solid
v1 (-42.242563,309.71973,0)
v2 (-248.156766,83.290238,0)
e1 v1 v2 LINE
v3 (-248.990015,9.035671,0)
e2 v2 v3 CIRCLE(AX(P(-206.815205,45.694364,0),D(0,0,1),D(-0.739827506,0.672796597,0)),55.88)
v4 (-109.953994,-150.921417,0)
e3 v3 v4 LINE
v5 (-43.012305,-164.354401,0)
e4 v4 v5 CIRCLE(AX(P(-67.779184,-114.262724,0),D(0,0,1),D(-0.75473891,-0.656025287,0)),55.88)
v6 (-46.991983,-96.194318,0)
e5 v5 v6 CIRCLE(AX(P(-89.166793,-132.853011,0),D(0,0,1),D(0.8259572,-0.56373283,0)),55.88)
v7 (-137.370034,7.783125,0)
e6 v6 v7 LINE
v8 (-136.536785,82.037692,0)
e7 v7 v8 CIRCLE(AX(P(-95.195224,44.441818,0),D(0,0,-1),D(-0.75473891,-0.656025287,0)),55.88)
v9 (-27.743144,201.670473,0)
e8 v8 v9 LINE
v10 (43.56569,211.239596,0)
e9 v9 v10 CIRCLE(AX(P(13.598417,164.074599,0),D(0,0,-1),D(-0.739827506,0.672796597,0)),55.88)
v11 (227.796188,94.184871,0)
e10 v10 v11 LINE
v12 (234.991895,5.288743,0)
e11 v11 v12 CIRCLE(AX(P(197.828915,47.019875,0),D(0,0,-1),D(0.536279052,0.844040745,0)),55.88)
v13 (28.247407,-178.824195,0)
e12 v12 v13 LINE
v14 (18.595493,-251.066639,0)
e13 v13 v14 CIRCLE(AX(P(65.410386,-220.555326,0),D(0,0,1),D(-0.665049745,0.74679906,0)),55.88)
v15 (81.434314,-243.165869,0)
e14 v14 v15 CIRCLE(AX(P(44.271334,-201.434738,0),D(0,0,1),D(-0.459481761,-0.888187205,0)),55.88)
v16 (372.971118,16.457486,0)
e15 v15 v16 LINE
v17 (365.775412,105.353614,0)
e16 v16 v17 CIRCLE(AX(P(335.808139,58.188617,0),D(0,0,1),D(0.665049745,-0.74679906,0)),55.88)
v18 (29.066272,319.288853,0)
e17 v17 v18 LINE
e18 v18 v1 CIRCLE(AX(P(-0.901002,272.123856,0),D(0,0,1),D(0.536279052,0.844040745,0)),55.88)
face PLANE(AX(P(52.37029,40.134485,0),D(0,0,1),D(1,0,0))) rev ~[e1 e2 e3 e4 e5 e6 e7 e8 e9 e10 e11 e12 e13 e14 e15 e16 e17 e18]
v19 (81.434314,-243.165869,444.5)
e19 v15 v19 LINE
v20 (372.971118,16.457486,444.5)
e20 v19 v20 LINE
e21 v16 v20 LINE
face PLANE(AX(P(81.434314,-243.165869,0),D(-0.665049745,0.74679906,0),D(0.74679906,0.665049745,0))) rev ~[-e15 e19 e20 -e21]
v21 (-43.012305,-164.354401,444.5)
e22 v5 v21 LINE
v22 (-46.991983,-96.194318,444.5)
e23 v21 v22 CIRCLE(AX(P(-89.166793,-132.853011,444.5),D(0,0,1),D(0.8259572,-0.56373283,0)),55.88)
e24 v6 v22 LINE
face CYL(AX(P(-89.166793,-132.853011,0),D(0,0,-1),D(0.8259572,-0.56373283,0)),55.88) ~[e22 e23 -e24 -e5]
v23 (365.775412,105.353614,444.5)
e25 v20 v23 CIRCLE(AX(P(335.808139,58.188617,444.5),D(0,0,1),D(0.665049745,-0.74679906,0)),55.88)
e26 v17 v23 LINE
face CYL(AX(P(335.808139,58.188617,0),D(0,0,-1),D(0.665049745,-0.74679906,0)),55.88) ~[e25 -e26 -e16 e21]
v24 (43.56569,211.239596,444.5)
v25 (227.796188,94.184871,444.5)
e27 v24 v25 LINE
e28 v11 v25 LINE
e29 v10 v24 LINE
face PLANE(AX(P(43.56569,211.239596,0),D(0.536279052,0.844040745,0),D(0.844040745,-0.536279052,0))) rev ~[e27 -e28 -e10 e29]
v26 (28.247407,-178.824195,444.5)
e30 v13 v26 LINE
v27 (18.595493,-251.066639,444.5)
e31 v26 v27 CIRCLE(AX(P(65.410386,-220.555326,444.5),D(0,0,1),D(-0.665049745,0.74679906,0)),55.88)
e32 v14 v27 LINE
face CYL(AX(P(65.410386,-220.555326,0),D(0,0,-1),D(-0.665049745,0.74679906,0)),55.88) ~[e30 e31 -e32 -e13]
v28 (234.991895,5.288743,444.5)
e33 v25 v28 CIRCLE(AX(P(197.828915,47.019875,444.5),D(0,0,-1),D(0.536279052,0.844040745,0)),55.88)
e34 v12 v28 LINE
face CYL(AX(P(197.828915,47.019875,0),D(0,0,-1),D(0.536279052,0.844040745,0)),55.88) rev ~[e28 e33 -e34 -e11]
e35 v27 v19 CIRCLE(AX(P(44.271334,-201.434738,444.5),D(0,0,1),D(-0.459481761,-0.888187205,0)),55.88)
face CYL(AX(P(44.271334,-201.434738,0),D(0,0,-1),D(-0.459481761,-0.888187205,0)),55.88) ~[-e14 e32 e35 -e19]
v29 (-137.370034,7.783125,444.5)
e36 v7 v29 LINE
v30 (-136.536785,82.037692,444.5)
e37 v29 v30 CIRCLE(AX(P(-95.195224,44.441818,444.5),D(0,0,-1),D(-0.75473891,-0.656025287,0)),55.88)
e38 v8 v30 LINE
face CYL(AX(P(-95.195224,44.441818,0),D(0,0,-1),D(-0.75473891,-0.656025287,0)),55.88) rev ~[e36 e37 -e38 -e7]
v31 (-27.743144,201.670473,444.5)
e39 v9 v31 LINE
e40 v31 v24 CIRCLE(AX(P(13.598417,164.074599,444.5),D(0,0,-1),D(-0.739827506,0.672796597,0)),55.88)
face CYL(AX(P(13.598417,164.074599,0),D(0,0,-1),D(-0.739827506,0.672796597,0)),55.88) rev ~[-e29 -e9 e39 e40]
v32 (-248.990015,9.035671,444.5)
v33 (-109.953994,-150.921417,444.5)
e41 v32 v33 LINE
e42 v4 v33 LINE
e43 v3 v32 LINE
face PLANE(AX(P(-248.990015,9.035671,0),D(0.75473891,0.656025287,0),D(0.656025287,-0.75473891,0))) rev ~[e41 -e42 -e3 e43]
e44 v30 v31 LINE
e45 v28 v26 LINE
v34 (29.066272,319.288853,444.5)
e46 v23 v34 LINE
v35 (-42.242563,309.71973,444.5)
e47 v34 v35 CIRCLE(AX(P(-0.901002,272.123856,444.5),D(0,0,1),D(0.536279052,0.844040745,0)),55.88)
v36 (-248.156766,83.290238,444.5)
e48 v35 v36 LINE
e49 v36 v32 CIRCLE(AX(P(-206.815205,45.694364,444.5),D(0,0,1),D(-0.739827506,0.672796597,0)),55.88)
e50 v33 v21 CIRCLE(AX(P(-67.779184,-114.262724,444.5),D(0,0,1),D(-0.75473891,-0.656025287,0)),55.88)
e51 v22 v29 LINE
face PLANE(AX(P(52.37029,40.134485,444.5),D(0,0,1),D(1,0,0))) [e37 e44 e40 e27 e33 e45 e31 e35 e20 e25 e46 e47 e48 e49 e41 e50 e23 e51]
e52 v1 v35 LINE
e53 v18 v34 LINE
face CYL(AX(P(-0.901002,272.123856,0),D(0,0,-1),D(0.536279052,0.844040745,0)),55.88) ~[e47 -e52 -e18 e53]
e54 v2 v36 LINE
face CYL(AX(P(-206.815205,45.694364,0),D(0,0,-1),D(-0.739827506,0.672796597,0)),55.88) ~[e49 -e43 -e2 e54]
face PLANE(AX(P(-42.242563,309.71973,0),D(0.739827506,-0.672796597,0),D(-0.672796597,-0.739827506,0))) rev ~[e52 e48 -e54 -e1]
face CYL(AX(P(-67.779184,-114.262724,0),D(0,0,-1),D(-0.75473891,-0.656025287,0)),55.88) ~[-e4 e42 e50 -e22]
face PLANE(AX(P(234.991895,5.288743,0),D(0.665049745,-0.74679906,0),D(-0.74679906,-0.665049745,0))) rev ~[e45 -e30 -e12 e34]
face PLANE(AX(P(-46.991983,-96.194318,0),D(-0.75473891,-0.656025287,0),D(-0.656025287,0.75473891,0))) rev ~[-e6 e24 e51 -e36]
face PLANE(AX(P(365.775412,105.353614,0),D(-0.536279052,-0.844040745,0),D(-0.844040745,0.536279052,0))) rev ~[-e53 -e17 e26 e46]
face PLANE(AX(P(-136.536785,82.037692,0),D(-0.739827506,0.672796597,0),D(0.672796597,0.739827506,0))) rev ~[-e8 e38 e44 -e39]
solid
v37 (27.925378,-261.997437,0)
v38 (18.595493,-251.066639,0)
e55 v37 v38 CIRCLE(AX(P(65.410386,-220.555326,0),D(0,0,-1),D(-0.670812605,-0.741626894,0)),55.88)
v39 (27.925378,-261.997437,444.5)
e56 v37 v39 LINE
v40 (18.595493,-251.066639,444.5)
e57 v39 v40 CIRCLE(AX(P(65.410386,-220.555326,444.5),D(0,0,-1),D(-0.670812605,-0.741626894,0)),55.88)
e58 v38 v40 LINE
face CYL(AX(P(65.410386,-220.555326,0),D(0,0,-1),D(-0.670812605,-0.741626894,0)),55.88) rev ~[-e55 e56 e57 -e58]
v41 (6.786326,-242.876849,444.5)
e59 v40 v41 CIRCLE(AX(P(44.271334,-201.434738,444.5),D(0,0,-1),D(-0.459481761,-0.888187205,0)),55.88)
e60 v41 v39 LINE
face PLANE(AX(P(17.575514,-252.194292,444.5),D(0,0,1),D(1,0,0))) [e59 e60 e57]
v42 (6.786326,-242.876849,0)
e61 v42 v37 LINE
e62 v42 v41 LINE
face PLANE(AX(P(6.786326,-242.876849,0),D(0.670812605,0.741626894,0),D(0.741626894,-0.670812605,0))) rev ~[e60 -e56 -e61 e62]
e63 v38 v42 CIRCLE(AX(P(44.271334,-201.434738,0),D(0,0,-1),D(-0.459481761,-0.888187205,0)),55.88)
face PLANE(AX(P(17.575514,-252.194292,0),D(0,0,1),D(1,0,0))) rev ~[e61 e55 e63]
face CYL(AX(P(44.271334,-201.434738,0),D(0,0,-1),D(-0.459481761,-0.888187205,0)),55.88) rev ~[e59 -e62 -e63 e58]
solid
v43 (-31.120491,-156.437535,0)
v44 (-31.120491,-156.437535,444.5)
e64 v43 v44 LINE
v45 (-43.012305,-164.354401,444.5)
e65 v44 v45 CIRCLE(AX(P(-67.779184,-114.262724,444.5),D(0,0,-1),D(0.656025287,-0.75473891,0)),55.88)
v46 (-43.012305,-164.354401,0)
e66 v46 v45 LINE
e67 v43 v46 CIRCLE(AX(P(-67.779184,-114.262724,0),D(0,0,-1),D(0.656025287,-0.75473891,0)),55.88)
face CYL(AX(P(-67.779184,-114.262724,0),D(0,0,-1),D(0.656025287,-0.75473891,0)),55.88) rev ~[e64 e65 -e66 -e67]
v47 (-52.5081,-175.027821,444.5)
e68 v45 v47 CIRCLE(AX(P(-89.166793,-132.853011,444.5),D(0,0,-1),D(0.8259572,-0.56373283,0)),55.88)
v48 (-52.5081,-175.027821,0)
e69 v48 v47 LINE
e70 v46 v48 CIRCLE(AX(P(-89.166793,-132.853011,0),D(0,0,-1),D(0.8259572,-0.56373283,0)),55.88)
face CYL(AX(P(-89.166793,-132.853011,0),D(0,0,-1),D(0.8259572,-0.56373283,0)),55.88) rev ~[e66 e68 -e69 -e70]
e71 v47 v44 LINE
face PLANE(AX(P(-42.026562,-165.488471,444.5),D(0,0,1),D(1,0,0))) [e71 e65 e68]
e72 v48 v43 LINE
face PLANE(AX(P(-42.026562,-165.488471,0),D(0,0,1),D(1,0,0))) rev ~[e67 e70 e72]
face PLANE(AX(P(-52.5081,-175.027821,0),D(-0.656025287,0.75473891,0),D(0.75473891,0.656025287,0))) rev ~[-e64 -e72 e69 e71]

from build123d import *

# Parameters (mm, degrees)
F2_DEPTH = 444.5


# Not quite as in the source:
# - the program builds the solid bodies; features that only make, move or delete a surface that nothing else refers to are left out


with BuildPart() as f2:
    # F0 (on Top) → F2 (new body)
    with BuildSketch(Plane.XY):
        with BuildLine():
            ThreePointArc((27.9253781423, -261.9974371284), (22.9075756056, -256.8332185716), (18.5954934194, -251.0666387518))
            ThreePointArc((18.5954934194, -251.0666387518), (12.4265327198, -247.3529587055), (6.7863258601, -242.8768485437))
            Line((6.7863258601, -242.8768485437), (27.9253781423, -261.9974371284))
        make_face()
    extrude(amount=F2_DEPTH)


with BuildPart() as f2b:
    # F0 (on Top) → F2, piece 2 (new body)
    with BuildSketch(Plane.XY):
        with BuildLine():
            ThreePointArc((-31.1204911076, -156.4375346544), (-36.8123563953, -160.777560461), (-43.0123050994, -164.3544013187))
            ThreePointArc((-43.0123050994, -164.3544013187), (-47.417706923, -169.9958186255), (-52.5081003988, -175.0278210814))
            Line((-52.5081003988, -175.0278210814), (-31.1204911076, -156.4375346544))
        make_face()
    extrude(amount=F2_DEPTH)


with BuildPart() as f2c:
    # F0 (on Top) → F2, piece 3 (new body)
    with BuildSketch(Plane.XY):
        with BuildLine():
            Line((-248.9900153466, 9.0356711772), (-109.9539944558, -150.9214173747))
            ThreePointArc((-109.9539944558, -150.9214173747), (-78.773286297, -169.0505342784), (-43.0123050994, -164.3544013187))
            ThreePointArc((-43.0123050994, -164.3544013187), (-33.3817999447, -129.5958798966), (-46.991983119, -96.1943177332))
            Line((-46.991983119, -96.1943177332), (-137.3700341689, 7.7831251072))
            ThreePointArc((-137.3700341689, 7.7831251072), (-151.071705911, 45.068837312), (-136.5367849162, 82.0376919712))
            Line((-136.5367849162, 82.0376919712), (-27.7431442317, 201.6704729463))
            ThreePointArc((-27.7431442317, 201.6704729463), (6.1663489106, 219.4581595516), (43.5656902405, 211.2395959291))
            Line((43.5656902405, 211.2395959291), (227.7961883679, 94.1848714271))
            ThreePointArc((227.7961883679, 94.1848714271), (253.5267437249, 51.5283411547), (234.9918947151, 5.2887431239))
            Line((234.9918947151, 5.2887431239), (28.2474067267, -178.8241948134))
            ThreePointArc((28.2474067267, -178.8241948134), (10.0225407283, -213.1552626245), (18.5954934194, -251.0666387518))
            ThreePointArc((18.5954934194, -251.0666387518), (51.2422832265, -256.8782248907), (81.4343139607, -243.1658692103))
            Line((81.4343139607, -243.1658692103), (372.971118428, 16.4574857317))
            ThreePointArc((372.971118428, 16.4574857317), (391.5059674378, 62.6970837625), (365.7754120808, 105.3536140349))
            Line((365.7754120808, 105.3536140349), (29.0662717973, 319.2888530632))
            ThreePointArc((29.0662717973, 319.2888530632), (-8.3330695326, 327.5074166856), (-42.2425626749, 309.7197300804))
            Line((-42.2425626749, 309.7197300804), (-248.1567660939, 83.2902380412))
            ThreePointArc((-248.1567660939, 83.2902380412), (-262.6916870886, 46.3213833819), (-248.9900153466, 9.0356711772))
        make_face()
    extrude(amount=F2_DEPTH)


solid = Compound([f2.part, f2b.part, f2c.part])
